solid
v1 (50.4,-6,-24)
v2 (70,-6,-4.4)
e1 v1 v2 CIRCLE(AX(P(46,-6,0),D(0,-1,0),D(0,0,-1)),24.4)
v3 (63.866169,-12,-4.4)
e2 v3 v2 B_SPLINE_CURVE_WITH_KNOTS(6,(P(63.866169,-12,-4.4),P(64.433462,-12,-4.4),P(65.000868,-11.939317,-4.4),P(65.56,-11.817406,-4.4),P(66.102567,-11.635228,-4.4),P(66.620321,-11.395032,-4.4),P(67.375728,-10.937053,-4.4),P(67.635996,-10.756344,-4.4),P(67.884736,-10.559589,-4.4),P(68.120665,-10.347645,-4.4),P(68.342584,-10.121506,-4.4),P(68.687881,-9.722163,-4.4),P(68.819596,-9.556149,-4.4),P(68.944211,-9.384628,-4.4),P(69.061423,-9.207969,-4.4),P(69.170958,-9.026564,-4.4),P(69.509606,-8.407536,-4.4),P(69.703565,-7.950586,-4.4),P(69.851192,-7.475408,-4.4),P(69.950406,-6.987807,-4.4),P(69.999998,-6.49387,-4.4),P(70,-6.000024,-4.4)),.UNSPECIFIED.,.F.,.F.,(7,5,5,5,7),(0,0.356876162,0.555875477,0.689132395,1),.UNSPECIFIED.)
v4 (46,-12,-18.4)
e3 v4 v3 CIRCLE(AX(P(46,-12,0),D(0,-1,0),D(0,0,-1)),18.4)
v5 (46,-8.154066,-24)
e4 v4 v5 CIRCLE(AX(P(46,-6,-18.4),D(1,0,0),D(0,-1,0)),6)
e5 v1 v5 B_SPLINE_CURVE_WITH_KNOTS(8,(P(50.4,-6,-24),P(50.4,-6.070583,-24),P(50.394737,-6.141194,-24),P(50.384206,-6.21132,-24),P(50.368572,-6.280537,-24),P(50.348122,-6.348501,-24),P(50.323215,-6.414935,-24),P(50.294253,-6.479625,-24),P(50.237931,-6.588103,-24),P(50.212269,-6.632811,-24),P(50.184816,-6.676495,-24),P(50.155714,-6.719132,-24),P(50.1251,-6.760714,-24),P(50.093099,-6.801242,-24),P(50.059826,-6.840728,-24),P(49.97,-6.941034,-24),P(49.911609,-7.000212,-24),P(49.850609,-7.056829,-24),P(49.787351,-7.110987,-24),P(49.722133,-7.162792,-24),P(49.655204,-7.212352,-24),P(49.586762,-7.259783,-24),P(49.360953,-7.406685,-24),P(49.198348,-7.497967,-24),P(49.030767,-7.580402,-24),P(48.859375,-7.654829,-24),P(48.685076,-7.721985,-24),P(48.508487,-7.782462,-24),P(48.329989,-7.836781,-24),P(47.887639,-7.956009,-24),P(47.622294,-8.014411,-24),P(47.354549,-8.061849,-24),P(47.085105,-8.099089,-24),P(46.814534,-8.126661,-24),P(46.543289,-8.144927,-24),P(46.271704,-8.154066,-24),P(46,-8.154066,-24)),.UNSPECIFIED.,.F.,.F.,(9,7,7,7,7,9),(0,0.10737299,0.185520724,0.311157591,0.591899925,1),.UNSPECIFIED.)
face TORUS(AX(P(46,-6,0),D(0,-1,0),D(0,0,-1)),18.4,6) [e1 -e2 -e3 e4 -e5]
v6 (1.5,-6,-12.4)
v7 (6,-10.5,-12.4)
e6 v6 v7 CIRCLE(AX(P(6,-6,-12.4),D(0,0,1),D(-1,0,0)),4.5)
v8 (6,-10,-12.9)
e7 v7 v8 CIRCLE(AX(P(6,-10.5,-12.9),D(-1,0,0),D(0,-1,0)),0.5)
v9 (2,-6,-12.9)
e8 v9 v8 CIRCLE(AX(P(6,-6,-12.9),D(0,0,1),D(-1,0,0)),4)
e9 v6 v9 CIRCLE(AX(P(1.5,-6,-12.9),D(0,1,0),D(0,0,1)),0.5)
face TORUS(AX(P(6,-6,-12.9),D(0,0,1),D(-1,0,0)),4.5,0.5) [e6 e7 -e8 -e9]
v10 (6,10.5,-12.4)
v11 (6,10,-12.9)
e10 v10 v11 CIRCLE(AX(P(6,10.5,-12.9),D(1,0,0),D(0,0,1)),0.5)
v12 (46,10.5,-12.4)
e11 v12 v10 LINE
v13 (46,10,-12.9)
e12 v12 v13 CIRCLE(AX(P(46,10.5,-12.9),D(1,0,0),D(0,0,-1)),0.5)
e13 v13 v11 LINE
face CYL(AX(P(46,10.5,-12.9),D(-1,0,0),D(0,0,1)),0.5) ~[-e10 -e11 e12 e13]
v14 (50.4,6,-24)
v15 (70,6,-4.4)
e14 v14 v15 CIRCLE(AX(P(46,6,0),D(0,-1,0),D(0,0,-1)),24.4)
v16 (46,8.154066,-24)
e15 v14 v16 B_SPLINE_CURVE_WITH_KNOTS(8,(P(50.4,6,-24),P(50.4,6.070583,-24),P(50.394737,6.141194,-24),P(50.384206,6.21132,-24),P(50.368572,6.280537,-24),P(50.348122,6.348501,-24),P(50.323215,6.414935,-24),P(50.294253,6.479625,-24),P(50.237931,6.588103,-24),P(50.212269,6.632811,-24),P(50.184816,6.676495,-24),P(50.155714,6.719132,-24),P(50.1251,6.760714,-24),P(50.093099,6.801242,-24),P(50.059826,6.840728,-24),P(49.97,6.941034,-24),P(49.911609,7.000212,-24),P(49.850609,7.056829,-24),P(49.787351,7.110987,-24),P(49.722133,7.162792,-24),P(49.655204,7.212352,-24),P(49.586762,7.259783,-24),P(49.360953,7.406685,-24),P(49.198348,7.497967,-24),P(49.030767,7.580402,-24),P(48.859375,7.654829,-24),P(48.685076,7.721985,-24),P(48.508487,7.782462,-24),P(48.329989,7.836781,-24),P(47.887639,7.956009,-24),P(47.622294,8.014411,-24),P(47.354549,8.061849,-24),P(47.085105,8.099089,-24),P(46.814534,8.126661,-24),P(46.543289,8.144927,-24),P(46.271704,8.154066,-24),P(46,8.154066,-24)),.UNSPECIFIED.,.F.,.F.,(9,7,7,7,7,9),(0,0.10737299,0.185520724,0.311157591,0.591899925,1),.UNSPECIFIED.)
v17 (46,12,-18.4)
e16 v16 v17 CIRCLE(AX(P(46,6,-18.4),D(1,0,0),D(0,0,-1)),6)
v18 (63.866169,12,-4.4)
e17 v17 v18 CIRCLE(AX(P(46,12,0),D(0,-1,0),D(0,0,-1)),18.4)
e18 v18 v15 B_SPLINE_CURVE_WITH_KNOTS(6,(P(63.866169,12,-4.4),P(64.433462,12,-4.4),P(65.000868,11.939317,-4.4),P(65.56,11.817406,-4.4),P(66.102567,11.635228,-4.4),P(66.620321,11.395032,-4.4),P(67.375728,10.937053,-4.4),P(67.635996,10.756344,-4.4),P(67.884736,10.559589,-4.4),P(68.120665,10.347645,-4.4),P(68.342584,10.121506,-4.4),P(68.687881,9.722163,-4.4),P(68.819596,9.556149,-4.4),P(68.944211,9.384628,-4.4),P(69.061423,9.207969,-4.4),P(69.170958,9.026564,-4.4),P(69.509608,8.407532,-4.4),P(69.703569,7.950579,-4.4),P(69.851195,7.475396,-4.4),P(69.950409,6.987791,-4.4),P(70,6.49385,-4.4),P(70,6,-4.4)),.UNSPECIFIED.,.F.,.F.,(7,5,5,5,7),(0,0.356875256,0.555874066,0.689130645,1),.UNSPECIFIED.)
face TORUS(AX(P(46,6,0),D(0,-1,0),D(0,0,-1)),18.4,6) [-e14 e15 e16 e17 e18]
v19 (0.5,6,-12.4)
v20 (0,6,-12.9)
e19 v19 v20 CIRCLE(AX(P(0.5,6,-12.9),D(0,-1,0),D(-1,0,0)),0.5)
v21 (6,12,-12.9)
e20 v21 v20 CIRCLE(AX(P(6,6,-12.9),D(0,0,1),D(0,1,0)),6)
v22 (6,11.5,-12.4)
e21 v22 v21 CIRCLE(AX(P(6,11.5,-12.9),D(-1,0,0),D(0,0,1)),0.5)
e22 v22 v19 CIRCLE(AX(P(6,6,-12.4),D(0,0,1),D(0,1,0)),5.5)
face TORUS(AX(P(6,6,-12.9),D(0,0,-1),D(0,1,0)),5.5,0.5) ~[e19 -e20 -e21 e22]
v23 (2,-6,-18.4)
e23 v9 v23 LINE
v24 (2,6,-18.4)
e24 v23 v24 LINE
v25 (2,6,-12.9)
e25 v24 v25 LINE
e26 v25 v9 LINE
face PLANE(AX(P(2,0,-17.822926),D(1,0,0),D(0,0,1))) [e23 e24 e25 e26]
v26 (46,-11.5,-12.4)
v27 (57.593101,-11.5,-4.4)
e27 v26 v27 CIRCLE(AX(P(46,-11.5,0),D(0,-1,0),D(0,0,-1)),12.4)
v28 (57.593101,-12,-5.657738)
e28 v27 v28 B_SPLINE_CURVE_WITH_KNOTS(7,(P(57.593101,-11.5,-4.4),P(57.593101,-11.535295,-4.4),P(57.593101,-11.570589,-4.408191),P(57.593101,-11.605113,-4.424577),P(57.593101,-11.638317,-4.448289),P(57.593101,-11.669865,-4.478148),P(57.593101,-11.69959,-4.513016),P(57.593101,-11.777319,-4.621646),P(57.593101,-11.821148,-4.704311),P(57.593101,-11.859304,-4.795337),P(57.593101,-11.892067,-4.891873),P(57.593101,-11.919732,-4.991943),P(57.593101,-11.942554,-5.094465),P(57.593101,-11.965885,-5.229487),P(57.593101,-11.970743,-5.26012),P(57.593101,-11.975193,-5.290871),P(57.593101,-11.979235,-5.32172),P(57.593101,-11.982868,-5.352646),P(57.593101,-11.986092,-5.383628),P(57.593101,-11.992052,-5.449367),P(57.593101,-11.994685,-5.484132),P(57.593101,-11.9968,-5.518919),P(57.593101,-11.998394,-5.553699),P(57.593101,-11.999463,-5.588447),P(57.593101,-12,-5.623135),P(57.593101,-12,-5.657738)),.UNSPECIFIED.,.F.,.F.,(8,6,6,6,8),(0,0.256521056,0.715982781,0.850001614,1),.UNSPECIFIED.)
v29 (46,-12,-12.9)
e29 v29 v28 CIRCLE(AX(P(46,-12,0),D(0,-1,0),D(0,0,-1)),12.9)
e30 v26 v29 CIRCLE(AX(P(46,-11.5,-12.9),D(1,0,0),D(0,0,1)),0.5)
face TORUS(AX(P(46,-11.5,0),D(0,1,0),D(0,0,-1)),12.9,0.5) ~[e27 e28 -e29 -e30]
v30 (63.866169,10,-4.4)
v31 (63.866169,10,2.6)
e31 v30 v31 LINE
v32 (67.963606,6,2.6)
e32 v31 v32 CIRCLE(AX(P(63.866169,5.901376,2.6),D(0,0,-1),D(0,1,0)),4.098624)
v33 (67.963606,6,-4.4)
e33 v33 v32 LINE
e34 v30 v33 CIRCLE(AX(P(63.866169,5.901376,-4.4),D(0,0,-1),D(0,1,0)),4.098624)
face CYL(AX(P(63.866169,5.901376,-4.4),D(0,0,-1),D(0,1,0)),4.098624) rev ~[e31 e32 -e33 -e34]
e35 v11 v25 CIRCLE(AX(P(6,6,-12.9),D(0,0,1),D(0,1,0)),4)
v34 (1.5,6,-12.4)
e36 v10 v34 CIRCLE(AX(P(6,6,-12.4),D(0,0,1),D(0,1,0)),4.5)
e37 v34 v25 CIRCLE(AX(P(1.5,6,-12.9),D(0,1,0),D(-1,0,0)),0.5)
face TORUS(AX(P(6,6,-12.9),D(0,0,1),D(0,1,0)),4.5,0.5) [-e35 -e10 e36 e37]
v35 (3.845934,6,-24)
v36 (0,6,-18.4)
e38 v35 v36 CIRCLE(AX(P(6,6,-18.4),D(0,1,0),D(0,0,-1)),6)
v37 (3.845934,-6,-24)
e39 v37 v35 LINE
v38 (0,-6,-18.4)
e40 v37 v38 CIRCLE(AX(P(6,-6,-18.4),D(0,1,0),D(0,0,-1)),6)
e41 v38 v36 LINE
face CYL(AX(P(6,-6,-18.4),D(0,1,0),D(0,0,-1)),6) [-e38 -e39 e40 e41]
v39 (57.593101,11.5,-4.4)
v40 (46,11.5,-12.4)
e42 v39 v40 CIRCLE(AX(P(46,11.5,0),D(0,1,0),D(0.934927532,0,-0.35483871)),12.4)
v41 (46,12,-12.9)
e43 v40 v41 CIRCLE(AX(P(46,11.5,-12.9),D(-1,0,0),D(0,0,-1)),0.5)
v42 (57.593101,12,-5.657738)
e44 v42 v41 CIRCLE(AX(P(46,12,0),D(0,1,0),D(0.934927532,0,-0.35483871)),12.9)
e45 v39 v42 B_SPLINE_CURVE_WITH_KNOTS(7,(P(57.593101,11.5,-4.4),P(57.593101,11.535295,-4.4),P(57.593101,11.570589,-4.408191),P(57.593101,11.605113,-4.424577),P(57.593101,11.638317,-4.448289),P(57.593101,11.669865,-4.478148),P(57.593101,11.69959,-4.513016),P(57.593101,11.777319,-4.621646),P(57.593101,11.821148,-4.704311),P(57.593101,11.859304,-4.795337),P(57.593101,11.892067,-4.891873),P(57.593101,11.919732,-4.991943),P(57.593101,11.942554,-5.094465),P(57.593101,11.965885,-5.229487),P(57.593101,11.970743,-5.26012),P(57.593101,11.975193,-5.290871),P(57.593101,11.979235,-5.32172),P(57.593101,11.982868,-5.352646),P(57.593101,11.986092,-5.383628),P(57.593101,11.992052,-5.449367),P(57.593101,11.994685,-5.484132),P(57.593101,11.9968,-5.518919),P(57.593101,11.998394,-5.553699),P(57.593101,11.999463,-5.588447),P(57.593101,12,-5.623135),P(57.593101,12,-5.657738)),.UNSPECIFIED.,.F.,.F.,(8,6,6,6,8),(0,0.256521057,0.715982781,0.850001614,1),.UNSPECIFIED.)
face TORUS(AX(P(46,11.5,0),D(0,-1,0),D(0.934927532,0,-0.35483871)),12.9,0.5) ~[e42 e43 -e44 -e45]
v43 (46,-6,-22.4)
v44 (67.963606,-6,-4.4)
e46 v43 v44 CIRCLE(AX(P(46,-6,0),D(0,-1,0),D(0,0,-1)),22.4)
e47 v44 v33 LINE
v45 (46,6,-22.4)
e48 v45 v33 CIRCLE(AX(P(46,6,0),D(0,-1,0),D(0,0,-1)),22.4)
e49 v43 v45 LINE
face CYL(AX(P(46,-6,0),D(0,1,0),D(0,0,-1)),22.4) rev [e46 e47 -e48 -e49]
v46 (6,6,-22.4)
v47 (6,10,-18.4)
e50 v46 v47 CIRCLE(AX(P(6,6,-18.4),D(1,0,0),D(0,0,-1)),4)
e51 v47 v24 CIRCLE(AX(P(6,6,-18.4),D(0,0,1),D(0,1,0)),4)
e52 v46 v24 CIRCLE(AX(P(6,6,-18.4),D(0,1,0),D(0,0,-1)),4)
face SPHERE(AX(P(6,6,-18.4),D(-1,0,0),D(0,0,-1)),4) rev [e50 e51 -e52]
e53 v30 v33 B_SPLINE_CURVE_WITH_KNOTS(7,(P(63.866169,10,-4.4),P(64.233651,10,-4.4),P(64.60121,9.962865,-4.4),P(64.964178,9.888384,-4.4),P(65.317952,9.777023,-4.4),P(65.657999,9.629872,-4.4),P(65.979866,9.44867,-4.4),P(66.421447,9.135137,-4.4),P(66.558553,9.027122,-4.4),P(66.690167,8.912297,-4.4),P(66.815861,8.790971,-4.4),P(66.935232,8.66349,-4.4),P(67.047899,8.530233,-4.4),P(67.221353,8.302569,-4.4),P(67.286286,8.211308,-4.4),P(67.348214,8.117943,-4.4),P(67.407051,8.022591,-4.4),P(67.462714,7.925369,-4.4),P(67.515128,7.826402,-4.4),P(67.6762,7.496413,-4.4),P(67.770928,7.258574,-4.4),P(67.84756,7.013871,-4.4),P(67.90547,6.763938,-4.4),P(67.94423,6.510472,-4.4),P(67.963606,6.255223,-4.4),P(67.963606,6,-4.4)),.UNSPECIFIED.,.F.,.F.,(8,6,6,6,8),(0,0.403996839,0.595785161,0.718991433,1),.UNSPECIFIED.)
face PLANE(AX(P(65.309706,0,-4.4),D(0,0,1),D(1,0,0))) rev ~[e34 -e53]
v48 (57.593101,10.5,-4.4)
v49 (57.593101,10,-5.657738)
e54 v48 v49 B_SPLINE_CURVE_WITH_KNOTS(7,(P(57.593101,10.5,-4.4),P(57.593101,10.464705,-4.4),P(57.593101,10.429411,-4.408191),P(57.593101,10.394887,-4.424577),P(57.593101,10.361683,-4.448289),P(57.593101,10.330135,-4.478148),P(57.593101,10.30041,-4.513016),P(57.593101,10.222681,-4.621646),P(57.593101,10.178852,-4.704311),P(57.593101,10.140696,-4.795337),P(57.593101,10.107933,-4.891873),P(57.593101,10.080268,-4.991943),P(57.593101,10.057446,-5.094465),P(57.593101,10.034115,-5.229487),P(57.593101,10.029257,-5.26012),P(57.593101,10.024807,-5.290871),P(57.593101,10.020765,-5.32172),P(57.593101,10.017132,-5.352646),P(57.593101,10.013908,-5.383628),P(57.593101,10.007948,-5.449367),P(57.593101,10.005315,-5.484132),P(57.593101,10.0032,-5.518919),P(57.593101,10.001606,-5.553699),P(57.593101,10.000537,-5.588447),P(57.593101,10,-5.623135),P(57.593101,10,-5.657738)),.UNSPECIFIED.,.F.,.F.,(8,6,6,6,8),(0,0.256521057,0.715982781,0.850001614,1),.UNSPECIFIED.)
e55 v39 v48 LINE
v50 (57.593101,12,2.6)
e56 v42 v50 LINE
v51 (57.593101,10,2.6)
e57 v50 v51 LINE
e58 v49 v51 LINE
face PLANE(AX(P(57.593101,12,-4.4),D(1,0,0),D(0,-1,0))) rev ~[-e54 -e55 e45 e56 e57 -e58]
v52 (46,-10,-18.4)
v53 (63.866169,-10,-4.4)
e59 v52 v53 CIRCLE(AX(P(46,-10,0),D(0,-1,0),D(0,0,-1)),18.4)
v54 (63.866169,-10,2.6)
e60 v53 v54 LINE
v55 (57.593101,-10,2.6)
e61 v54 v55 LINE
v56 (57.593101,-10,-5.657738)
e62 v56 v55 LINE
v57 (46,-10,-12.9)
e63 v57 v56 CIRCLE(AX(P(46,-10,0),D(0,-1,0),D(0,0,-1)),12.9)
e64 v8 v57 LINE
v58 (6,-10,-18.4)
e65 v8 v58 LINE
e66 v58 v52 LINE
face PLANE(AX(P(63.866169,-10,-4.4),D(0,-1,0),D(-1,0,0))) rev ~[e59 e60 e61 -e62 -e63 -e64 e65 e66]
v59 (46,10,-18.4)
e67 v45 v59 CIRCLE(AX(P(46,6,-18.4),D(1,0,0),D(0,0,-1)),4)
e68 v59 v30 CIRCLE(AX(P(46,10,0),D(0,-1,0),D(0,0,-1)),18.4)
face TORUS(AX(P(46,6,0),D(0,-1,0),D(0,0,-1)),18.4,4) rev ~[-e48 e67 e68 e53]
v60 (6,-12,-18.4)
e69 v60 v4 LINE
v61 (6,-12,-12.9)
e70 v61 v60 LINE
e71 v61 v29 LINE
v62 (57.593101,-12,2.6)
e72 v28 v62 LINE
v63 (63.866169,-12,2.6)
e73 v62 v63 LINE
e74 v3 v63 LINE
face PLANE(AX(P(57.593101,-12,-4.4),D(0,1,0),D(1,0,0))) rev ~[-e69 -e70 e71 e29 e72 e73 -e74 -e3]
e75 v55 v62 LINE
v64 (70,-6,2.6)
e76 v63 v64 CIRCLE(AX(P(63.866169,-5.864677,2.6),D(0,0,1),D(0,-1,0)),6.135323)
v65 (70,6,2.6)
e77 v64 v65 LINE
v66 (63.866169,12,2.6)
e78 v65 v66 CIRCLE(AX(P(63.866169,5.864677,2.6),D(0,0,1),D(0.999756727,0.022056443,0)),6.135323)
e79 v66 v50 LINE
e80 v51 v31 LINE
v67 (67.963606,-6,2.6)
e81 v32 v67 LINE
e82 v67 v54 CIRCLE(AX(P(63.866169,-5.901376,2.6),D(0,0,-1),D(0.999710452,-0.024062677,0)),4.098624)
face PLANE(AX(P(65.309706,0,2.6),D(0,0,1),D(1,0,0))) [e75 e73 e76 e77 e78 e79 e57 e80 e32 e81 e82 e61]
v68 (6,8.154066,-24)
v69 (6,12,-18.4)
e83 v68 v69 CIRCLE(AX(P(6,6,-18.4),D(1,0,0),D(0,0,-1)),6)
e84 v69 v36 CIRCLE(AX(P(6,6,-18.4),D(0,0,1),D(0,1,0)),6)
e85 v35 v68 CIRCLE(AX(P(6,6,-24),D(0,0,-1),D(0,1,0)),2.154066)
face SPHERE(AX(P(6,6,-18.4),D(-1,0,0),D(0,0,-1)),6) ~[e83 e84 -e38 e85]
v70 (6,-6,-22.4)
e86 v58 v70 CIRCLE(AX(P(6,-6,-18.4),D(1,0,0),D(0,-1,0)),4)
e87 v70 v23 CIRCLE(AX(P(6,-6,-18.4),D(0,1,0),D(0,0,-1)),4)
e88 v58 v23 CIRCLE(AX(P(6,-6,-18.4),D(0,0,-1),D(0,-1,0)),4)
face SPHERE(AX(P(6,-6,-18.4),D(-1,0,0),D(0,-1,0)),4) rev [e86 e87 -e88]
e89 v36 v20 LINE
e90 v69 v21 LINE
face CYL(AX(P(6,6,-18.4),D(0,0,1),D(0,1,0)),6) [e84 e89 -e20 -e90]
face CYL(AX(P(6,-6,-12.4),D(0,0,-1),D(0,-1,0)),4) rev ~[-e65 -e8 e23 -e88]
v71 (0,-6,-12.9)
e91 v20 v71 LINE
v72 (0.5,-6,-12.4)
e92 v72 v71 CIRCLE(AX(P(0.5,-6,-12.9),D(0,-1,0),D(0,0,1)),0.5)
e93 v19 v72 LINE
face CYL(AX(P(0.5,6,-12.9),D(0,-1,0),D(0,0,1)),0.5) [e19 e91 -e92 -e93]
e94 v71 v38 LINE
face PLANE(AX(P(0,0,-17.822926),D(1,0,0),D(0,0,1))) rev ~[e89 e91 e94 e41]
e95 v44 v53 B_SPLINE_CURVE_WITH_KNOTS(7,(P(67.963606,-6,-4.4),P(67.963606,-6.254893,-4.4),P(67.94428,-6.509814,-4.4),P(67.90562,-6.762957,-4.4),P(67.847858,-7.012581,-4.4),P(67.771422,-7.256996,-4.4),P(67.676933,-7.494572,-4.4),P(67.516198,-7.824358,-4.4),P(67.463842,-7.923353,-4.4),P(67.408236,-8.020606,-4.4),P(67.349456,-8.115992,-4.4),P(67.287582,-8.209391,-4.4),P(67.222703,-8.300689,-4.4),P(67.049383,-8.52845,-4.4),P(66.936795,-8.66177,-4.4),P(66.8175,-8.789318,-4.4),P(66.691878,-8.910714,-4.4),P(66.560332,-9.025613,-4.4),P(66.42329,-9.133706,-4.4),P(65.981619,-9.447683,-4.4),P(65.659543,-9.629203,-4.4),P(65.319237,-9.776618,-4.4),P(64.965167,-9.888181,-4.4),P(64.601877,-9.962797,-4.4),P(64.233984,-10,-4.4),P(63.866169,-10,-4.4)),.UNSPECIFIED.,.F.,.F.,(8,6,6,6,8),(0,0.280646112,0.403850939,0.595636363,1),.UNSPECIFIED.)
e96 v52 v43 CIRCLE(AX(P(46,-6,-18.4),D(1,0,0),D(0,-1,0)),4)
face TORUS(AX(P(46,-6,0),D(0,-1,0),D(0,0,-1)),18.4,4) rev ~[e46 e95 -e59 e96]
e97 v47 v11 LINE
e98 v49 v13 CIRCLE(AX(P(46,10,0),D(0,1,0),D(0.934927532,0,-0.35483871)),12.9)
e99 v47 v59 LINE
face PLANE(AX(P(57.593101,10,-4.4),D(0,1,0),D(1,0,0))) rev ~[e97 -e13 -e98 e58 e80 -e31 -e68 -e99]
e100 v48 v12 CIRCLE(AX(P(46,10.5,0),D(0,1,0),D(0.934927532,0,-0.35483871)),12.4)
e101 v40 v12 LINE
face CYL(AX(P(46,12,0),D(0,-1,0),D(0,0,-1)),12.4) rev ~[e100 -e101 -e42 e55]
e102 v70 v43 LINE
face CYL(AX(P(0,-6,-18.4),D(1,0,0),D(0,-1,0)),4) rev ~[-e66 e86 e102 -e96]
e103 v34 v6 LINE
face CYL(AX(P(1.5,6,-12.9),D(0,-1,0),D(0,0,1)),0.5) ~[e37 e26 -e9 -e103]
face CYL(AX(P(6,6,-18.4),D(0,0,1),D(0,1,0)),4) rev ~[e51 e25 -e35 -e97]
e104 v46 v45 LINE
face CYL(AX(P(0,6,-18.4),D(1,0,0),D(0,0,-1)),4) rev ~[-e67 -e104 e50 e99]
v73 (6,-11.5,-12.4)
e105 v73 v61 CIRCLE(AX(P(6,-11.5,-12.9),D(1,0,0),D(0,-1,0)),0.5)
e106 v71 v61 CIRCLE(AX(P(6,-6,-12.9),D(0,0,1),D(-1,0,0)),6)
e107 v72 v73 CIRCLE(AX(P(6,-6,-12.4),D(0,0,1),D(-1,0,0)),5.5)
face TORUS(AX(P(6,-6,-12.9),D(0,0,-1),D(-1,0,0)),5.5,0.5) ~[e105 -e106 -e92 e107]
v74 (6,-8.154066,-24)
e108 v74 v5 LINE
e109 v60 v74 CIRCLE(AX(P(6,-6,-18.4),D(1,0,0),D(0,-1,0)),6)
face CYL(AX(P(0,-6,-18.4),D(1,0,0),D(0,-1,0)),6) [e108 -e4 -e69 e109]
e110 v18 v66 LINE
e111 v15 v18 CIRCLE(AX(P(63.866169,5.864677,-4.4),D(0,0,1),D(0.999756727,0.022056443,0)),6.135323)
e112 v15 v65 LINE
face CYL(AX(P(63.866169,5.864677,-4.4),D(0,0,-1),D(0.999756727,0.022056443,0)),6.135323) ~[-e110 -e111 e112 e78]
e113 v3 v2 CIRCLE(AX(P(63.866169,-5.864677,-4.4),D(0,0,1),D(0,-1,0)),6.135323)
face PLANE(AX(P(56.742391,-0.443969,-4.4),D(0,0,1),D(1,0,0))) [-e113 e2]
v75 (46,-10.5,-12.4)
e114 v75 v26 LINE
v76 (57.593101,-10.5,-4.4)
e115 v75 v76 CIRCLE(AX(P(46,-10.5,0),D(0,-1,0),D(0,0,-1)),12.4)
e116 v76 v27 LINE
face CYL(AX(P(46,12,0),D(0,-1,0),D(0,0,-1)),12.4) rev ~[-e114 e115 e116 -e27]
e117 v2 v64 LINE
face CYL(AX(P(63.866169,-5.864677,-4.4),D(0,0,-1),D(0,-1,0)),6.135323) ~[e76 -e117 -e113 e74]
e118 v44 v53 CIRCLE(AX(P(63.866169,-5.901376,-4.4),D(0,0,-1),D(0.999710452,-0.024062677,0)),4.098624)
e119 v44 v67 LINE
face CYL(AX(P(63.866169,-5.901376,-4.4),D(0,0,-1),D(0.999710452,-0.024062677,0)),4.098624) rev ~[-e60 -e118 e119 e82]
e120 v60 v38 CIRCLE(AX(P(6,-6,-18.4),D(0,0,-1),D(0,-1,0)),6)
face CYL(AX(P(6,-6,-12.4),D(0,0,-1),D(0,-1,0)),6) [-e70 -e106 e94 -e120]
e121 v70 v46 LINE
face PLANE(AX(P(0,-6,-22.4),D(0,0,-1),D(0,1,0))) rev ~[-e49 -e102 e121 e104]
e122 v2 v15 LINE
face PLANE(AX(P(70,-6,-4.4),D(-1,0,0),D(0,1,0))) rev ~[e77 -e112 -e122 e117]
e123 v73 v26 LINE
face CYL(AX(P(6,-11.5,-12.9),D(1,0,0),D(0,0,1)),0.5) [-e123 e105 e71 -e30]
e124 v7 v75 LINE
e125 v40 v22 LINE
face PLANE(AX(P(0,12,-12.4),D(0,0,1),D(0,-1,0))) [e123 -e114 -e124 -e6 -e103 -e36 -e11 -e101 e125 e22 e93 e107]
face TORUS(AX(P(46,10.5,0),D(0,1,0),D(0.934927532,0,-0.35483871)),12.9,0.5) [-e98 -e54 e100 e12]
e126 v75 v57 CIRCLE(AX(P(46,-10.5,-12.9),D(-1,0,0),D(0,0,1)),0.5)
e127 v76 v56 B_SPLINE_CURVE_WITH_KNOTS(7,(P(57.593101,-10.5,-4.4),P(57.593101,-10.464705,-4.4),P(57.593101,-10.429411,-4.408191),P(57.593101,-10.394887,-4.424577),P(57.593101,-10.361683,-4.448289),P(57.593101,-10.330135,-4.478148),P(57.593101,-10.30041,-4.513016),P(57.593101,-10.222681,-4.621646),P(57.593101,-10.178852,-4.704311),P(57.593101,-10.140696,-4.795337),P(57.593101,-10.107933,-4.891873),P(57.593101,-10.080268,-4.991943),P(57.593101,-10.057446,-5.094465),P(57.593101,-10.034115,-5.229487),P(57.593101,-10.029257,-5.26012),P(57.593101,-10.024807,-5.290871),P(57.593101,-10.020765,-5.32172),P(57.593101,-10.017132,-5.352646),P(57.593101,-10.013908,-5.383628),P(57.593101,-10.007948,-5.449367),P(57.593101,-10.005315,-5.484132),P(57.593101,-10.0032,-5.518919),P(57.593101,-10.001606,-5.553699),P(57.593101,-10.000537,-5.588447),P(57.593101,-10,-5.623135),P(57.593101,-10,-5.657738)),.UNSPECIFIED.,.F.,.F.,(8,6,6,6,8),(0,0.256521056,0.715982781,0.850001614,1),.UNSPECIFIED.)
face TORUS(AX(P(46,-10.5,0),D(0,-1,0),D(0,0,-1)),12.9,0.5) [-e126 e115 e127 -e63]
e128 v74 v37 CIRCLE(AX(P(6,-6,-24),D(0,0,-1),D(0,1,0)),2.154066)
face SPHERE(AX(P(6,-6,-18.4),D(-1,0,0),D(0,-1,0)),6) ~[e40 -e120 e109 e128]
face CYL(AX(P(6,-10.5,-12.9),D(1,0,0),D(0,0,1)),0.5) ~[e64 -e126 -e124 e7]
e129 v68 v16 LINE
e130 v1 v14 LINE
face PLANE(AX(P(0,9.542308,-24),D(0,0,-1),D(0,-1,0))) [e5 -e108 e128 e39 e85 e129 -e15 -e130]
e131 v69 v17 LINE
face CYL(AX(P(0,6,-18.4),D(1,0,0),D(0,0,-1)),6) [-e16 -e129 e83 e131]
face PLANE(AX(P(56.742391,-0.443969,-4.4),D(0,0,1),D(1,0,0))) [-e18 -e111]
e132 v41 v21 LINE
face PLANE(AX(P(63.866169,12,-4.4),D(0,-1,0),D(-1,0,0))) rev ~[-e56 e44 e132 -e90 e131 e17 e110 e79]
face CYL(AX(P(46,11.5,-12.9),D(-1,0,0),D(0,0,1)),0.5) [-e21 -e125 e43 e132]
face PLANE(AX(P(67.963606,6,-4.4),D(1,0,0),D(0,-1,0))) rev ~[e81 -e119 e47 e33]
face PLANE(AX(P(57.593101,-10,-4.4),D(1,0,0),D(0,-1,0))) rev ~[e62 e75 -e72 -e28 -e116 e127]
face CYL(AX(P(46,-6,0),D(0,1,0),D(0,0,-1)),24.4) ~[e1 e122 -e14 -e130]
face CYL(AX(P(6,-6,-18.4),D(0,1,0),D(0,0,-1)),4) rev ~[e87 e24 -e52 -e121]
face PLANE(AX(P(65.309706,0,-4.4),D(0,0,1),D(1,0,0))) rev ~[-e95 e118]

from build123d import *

# Parameters (mm, degrees)
F3_R      = 6
F4_T      = -2
F6_W      = 43.5708351433
F6_H      = 71.2567269802
F7_DEPTH  = 25.2
F9_DEPTH  = 7
F10_W     = 21.0461514253
F10_H     = 5.3538460713
F11_DEPTH = 73.3
F12_R     = 0.5


with BuildPart() as f2:
    # F2: sweep along a path in F0
    with BuildLine(Plane.XZ) as f2_path:
        Line((0, -24.4), (46, -24.4))
        ThreePointArc((46, -24.4), (61.6204993518, -18.7445992222), (70, -4.4))
    # F1 (on Right) → F2 (sweep)
    with BuildSketch(Plane.YZ):
        with BuildLine():
            Line((-6, -24.4), (6, -24.4))
            ThreePointArc((6, -24.4), (10.2426406871, -22.6426406871), (12, -18.4))
            Line((12, -18.4), (12, -12.4))
            Line((12, -12.4), (-12, -12.4))
            Line((-12, -12.4), (-12, -18.4))
            ThreePointArc((-12, -18.4), (-10.2426406871, -22.6426406871), (-6, -24.4))
        make_face()
    sweep(path=f2_path.line)

    # F3
    f3_edges = [f2.edges().sort_by_distance(p)[0] for p in [
        (0, -12, -15.4),
        (0, 10.242641, -22.642641),
        (0, 12, -15.4),
        (0, -10.242641, -22.642641),
    ]]
    fillet(f3_edges, radius=F3_R)

    # F4
    f4_openings = [f2.faces().sort_by_distance(p)[0] for p in [
        (23.307448, 0, -12.4),
        (53.938287, 0, -9.525944),
        (63.838518, 0, -3.270395),
    ]]
    offset(amount=F4_T, openings=f4_openings)

    # F6 (on face) → F7 (cut)
    with BuildSketch(Plane.XY.offset(-4.4)):
        with Locations((56.7423906177, -0.4439689219)):
            Rectangle(F6_W, F6_H)
    extrude(amount=F7_DEPTH, mode=Mode.SUBTRACT)

    # F8 (on face) → F9 (join)
    with BuildSketch(Plane.XY.offset(-4.4)):
        with BuildLine():
            Line((63.8661691473, 12), (57.593101397, 12))
            Line((57.593101397, 12), (57.593101397, 10))
            Line((57.593101397, 10), (63.8661691473, 10))
            ThreePointArc((63.8661691473, 10), (66.7292527517, 8.8342023924), (67.9636062613, 6))
            Line((67.9636062613, 6), (67.9636062613, -6))
            ThreePointArc((67.9636062613, -6), (66.7292527517, -8.8342023924), (63.8661691473, -10))
            Line((63.8661691473, -10), (57.593101397, -10))
            Line((57.593101397, -10), (57.593101397, -12))
            Line((57.593101397, -12), (63.8661691473, -12))
            ThreePointArc((63.8661691473, -12), (68.1563871176, -10.250588481), (70, -6))
            Line((70, -6), (70, 6))
            ThreePointArc((70, 6), (68.1563871176, 10.250588481), (63.8661691473, 12))
        make_face()
    extrude(amount=F9_DEPTH)

    # F10 (on face) → F11 (cut)
    with BuildSketch(Plane(origin=(0, 0, 0), x_dir=(0, -1, 0), z_dir=(-1, 0, 0))):
        with Locations((0.9807674214, -26.6769230357)):
            Rectangle(F10_W, F10_H)
    extrude(amount=-F11_DEPTH, mode=Mode.SUBTRACT)

    # F12
    f12_edges = [f2.edges().sort_by_distance(p)[0] for p in [
        (26, -12, -12.4),
        (53.042727, -12, -10.205881),
        (26, 12, -12.4),
        (1.757359, 10.242641, -12.4),
        (0, 0, -12.4),
        (1.757359, -10.242641, -12.4),
        (26, -10, -12.4),
        (3.171573, -8.828427, -12.4),
        (2, 0, -12.4),
        (3.171573, 8.828427, -12.4),
        (26, 10, -12.4),
        (53.042727, -10, -10.205881),
        (53.042727, 10, -10.205881),
        (53.042727, 12, -10.205881),
    ]]
    fillet(f12_edges, radius=F12_R)


solid = f2.part
